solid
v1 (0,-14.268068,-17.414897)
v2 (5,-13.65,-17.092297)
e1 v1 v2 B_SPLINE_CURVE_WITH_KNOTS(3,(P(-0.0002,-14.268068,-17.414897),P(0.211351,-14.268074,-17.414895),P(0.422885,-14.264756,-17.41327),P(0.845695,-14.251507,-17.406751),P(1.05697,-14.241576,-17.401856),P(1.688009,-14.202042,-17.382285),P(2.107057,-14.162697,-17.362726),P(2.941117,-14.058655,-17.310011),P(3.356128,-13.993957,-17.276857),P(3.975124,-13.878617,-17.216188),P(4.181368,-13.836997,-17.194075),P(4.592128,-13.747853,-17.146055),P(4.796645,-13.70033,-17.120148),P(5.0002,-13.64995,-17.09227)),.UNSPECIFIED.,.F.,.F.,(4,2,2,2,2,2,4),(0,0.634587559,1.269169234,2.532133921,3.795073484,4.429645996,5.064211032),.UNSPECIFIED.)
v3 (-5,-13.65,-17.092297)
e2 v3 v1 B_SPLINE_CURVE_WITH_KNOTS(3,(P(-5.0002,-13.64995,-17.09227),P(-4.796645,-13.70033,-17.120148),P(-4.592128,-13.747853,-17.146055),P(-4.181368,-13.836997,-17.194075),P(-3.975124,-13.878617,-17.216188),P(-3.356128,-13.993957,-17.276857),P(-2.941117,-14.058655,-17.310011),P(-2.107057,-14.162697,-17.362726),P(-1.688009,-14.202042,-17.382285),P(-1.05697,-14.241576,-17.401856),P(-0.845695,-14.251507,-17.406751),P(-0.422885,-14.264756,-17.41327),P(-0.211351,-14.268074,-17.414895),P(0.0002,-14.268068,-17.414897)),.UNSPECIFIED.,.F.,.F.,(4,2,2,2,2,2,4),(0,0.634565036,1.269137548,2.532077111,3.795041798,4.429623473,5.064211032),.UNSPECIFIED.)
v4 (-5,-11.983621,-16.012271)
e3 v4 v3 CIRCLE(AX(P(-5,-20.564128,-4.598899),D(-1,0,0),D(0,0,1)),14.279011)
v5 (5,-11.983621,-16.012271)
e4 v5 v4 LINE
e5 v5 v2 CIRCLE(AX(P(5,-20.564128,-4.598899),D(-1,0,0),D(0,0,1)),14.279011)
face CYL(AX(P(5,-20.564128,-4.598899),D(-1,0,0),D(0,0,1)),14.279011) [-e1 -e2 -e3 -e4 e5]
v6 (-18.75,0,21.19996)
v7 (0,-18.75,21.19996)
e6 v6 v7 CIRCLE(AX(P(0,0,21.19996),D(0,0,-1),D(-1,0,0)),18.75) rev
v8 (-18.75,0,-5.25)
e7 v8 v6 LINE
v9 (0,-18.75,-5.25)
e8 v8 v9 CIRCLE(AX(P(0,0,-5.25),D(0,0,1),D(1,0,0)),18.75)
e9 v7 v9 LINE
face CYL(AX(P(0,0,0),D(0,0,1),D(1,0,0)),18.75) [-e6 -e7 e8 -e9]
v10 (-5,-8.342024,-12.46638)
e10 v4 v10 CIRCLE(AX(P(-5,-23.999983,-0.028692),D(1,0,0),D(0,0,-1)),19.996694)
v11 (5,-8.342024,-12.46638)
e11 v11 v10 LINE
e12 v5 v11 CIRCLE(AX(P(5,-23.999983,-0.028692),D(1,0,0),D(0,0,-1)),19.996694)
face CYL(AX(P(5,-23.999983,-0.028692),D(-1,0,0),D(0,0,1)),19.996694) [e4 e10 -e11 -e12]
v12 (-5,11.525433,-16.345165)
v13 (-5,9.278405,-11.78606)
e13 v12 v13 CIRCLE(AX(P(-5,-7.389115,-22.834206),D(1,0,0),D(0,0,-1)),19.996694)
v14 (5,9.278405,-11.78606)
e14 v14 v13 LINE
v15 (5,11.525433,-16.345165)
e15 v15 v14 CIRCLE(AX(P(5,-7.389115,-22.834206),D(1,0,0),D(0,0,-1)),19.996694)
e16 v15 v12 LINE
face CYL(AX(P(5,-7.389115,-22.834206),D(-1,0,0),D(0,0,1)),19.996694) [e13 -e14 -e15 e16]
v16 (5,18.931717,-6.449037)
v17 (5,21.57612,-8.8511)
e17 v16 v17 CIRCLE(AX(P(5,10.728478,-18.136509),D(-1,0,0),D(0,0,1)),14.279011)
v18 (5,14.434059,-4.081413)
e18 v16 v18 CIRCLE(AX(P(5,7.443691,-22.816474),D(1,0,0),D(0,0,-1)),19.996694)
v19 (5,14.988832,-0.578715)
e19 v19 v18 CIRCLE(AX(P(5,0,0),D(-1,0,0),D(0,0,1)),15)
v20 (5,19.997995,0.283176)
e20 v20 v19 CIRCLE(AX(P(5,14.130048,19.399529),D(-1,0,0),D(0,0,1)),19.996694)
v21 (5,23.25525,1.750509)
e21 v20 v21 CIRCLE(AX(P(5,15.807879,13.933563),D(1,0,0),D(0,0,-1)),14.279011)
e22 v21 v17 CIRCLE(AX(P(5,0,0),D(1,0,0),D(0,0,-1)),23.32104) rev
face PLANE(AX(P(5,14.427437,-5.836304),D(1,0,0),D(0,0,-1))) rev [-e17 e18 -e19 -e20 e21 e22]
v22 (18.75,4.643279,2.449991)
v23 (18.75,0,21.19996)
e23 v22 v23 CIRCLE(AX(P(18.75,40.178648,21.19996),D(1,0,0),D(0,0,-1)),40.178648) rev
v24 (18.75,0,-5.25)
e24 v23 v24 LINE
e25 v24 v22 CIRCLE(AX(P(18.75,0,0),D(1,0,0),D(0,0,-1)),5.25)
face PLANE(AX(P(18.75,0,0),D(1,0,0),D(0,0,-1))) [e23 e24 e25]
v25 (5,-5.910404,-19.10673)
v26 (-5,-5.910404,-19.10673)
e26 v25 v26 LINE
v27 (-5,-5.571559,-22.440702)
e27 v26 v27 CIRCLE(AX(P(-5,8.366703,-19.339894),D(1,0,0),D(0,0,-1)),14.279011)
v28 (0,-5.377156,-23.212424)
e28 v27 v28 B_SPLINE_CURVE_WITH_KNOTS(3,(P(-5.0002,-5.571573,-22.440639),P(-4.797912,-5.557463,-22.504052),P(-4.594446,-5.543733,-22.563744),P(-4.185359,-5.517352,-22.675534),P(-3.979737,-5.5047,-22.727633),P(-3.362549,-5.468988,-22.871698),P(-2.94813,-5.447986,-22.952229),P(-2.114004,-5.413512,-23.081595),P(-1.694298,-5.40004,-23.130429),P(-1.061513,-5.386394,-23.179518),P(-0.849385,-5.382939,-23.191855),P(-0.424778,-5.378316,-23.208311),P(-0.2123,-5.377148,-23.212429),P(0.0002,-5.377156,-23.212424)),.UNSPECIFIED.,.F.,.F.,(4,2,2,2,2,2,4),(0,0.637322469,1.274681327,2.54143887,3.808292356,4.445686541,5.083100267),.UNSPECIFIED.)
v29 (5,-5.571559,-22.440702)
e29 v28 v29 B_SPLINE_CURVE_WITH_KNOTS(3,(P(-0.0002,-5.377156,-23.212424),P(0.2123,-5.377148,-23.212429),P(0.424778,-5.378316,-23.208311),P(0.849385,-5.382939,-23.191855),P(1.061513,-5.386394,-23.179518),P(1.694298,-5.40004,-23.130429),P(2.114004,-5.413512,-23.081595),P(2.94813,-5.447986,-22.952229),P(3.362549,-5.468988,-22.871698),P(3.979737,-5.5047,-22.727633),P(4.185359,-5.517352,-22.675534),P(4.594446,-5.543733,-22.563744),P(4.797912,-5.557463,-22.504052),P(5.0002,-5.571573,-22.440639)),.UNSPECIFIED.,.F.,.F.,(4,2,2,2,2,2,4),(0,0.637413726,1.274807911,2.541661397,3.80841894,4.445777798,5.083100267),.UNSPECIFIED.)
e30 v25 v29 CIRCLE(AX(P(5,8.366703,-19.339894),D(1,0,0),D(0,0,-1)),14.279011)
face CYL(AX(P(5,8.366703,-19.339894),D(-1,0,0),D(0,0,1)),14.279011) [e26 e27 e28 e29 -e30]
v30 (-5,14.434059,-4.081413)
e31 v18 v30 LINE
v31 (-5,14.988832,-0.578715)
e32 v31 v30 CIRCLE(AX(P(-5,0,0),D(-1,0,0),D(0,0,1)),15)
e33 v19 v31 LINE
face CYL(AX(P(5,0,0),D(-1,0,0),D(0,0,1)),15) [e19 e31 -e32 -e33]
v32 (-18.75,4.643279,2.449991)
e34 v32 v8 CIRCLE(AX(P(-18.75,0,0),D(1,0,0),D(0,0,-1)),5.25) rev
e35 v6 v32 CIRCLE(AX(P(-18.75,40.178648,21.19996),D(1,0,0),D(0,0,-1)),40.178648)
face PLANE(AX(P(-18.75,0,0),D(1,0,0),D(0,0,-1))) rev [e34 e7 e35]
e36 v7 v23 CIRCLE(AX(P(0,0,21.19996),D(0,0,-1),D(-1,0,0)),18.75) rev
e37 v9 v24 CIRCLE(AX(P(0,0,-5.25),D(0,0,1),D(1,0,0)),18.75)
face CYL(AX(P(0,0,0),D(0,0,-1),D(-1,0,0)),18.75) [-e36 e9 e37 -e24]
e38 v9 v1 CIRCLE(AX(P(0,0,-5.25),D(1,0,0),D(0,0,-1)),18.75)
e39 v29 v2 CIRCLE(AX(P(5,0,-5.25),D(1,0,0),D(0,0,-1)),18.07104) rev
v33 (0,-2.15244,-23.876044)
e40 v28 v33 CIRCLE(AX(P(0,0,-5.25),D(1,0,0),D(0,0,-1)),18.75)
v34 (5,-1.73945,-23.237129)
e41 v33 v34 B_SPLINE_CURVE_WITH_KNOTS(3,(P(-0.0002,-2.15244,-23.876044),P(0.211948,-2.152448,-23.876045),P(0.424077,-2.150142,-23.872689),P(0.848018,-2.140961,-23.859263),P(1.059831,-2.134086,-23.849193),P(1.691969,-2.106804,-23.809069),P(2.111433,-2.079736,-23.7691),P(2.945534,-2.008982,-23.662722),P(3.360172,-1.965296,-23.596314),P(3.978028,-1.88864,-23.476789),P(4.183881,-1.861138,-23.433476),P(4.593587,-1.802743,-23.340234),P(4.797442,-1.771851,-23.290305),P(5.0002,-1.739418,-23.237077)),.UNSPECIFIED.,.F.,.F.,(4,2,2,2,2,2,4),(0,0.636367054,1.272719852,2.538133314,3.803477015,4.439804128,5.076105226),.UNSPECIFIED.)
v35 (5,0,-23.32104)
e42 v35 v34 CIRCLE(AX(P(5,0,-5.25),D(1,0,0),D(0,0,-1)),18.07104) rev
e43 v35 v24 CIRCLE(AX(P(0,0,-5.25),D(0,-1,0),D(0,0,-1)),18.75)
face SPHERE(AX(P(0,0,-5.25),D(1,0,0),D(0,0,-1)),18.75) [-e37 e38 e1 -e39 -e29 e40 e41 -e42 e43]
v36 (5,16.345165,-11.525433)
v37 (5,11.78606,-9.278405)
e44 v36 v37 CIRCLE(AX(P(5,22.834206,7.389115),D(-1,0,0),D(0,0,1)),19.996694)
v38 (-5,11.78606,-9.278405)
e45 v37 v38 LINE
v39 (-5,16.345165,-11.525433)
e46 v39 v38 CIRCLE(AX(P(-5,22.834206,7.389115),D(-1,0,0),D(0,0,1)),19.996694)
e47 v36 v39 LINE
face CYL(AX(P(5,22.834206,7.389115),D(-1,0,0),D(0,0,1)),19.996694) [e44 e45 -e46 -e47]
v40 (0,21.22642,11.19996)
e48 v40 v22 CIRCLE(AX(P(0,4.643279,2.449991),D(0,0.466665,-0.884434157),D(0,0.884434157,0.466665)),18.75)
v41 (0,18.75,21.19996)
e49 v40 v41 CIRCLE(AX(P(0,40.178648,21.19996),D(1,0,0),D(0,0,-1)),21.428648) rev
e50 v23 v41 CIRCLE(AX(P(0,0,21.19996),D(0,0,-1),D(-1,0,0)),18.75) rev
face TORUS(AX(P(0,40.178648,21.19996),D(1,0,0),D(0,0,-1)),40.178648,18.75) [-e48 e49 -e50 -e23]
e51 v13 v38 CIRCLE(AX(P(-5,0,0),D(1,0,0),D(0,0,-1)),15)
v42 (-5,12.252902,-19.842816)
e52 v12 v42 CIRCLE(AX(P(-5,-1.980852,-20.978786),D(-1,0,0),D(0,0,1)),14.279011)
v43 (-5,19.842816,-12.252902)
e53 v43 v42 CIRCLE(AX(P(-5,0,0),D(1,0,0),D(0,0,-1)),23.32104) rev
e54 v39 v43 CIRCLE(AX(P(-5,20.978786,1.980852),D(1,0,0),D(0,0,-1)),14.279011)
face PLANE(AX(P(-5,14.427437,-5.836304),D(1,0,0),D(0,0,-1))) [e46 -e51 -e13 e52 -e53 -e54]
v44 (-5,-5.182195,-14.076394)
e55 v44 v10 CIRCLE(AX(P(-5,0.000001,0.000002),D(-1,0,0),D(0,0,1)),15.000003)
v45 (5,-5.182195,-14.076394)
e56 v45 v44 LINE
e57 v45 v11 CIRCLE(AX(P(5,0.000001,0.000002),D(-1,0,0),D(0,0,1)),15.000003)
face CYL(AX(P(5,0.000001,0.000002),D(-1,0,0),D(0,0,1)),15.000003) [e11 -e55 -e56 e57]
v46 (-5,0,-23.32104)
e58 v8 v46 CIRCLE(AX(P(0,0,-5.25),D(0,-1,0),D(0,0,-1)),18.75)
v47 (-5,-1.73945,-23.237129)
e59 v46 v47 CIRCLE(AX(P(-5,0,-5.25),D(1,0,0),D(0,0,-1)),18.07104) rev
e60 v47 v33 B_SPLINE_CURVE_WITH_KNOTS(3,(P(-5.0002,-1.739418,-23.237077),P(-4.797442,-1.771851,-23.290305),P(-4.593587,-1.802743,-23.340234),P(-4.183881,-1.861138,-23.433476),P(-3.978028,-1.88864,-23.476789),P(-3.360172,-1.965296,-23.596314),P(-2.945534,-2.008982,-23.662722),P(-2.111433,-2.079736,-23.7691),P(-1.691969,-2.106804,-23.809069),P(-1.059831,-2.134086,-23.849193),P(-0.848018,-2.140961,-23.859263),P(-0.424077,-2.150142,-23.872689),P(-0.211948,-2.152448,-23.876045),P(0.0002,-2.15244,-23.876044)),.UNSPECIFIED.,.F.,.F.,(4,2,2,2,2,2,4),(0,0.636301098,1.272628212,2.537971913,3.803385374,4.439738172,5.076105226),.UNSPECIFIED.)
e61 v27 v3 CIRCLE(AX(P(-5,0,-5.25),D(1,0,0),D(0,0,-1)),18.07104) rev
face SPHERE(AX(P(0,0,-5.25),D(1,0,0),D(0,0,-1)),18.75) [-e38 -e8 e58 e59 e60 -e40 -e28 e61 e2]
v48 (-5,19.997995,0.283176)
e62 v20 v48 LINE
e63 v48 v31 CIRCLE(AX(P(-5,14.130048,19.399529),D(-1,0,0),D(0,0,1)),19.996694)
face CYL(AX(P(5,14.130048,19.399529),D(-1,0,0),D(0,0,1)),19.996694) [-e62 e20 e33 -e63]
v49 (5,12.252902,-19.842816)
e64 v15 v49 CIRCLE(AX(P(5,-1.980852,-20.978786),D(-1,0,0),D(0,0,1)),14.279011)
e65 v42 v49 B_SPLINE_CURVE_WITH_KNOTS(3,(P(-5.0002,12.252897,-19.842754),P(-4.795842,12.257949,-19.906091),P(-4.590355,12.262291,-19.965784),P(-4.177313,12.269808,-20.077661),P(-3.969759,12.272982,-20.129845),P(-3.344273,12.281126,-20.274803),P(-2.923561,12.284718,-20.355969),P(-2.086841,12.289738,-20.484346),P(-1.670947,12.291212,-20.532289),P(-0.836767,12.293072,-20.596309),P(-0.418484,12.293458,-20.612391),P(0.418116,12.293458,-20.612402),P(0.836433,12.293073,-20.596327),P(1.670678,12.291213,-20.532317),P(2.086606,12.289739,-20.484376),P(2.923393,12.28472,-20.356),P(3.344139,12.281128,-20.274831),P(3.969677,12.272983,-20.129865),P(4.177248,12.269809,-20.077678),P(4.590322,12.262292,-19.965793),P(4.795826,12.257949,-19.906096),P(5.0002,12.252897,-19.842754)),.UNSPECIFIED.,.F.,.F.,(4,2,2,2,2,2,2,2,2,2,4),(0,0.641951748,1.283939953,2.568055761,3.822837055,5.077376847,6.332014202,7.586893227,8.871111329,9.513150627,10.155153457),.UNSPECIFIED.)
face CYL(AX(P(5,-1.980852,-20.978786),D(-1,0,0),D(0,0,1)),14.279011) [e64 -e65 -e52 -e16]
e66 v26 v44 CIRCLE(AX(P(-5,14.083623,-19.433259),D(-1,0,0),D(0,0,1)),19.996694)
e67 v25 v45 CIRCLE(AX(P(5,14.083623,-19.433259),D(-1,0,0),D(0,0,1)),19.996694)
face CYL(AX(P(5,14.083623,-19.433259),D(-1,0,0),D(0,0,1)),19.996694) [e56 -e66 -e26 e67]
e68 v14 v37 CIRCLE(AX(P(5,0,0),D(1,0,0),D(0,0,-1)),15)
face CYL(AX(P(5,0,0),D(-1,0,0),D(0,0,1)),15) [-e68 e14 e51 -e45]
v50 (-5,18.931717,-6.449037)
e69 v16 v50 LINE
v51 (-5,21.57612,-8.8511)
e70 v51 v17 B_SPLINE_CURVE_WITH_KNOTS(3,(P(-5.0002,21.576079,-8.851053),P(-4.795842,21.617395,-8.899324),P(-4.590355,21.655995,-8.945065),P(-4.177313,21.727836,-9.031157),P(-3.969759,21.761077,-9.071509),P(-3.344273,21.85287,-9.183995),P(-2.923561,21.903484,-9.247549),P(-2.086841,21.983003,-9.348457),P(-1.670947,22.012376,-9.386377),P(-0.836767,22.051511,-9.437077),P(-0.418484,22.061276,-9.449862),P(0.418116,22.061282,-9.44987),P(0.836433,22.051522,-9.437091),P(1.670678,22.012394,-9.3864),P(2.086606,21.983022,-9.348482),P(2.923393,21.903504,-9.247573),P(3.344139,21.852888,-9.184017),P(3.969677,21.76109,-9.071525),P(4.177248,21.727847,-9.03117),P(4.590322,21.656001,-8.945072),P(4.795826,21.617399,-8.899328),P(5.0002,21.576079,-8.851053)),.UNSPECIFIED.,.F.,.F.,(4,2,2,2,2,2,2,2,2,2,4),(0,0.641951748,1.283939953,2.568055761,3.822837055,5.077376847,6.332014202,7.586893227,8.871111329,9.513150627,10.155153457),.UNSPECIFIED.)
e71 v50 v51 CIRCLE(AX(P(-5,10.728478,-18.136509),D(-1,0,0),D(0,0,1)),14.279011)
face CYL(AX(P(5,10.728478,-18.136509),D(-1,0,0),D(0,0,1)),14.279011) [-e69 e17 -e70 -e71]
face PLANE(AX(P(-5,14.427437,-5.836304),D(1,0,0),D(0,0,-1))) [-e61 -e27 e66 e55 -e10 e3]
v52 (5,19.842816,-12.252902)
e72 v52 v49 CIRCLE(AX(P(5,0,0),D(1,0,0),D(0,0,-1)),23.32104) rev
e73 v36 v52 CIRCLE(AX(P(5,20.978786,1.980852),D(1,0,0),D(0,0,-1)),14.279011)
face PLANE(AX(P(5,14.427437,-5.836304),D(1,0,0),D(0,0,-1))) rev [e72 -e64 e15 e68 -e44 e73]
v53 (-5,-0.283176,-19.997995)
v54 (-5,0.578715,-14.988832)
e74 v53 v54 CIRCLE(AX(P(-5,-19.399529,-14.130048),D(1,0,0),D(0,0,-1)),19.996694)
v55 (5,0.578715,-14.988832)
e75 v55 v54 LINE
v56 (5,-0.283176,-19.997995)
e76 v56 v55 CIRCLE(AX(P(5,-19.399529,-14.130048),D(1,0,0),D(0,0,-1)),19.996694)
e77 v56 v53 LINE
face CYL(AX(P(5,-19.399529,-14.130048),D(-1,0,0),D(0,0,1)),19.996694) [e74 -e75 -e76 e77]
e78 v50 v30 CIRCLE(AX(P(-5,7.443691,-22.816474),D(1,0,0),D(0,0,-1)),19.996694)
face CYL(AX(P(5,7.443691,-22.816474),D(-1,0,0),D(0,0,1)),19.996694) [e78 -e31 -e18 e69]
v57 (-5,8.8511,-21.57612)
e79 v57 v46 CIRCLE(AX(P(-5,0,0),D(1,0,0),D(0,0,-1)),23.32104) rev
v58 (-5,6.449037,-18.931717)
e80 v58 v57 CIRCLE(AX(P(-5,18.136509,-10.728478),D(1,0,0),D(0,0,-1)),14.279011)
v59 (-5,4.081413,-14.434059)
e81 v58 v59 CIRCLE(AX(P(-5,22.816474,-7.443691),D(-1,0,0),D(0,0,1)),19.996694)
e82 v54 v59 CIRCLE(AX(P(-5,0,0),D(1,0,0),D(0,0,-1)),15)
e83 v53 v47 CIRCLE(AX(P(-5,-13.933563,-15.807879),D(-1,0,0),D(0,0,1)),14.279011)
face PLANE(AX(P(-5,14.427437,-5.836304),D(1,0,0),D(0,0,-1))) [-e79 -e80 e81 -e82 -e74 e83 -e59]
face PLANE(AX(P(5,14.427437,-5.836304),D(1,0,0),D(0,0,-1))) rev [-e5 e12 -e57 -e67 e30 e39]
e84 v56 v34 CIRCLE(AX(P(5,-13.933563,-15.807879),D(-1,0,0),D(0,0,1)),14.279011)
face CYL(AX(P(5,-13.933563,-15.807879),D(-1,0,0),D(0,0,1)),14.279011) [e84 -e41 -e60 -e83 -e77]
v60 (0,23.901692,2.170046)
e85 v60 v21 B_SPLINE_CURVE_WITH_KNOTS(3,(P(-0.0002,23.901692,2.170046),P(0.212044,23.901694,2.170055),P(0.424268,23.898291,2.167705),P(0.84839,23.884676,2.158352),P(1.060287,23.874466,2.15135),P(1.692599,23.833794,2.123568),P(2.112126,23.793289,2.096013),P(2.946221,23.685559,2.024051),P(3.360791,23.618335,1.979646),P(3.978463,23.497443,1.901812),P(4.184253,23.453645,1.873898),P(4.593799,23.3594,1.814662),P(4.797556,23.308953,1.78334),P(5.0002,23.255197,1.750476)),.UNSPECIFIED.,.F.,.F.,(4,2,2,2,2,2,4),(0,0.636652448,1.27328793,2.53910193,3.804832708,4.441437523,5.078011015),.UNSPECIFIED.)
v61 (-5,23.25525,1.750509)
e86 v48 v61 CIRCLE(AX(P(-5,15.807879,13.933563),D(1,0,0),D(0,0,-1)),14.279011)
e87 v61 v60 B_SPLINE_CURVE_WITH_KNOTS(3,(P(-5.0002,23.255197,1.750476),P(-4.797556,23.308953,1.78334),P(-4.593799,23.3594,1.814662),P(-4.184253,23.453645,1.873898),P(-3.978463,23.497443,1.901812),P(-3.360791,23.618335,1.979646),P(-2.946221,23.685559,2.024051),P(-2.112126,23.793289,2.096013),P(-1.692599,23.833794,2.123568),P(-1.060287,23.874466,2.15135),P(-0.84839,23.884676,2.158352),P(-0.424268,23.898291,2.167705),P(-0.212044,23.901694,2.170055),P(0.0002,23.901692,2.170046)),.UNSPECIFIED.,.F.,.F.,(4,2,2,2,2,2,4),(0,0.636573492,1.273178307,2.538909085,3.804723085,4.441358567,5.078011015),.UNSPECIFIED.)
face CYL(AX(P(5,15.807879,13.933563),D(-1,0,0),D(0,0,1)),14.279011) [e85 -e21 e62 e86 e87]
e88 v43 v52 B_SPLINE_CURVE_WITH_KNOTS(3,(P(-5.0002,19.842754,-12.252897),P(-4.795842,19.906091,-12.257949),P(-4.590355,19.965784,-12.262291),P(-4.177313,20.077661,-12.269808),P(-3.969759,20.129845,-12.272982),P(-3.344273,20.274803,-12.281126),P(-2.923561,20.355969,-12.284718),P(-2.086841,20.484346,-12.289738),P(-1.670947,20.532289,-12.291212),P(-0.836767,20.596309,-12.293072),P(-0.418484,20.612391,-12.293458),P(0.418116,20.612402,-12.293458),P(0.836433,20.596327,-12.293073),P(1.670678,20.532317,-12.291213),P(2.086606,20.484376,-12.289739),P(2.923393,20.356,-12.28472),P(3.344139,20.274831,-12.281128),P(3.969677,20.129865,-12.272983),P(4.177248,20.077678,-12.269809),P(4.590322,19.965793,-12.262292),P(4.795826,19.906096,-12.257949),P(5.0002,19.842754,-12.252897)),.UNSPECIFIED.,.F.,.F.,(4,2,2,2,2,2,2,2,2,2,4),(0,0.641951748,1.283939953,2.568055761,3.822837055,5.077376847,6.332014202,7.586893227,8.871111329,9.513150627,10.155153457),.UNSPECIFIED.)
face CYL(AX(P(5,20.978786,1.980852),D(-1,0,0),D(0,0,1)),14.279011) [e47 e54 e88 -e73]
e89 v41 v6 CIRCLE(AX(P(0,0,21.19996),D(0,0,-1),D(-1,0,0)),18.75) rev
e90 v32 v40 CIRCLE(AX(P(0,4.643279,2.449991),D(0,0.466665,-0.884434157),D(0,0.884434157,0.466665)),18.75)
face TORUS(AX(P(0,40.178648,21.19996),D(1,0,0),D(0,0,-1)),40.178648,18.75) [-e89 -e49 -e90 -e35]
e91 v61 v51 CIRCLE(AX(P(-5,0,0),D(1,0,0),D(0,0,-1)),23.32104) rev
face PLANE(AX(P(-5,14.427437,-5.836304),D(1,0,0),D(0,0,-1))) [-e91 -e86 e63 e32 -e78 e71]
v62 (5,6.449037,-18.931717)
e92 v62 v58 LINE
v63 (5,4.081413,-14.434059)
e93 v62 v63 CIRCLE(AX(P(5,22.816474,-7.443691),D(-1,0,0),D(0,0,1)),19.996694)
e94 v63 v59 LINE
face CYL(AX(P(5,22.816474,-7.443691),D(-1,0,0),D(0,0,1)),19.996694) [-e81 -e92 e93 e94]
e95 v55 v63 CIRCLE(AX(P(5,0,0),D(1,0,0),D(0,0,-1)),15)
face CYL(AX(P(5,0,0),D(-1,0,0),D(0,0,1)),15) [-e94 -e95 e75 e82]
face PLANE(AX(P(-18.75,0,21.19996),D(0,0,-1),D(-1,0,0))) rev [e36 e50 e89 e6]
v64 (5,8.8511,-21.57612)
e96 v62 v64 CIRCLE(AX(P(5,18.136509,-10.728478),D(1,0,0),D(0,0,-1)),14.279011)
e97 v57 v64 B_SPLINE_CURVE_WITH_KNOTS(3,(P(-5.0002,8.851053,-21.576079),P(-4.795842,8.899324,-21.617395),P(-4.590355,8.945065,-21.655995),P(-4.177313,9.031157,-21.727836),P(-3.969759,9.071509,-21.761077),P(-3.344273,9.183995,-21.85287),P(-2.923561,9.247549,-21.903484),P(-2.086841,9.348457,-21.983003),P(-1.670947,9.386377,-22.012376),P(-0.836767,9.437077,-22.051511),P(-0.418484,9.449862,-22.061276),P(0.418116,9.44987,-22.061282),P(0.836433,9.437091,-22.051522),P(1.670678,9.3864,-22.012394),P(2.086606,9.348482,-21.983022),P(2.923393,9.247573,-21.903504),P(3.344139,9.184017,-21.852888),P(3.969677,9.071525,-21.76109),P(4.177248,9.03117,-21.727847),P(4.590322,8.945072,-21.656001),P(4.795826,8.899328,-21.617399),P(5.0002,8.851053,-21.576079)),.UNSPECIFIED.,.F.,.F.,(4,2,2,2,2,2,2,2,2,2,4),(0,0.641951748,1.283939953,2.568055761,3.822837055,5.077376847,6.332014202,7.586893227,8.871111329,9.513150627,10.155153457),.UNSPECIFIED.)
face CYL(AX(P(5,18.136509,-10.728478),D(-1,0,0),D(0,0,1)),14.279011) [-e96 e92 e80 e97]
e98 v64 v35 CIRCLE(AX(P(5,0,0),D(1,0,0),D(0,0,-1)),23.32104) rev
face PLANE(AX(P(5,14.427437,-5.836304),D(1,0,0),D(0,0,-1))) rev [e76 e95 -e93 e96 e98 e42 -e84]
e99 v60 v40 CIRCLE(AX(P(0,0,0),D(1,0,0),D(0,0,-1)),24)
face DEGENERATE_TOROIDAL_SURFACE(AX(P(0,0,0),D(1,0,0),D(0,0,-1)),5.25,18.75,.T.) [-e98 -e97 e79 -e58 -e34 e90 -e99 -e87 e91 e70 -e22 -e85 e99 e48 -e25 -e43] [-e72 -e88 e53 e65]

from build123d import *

# Parameters (mm, degrees)
BOSS_EXTRUDE1_DEPTH      = 18.75
BOSS_EXTRUDE1_DEPTH_BACK = 18.75
FILLET1_R                = 18.75
CUT_EXTRUDE1_DEPTH       = 5
CUT_EXTRUDE1_DEPTH_BACK  = 5


with BuildPart() as part:
    # Sketch1 → Boss-Extrude1 (new, two sides: drawn at the far end of the back side and taken through both)
    with BuildSketch(Plane(origin=(0, 0, 0), x_dir=(0, 0, -1), z_dir=(1, 0, 0)).offset(-BOSS_EXTRUDE1_DEPTH_BACK)):
        with BuildLine():
            Line((-21.199959993, 18.75), (-21.199959993, 0))
            Line((-21.199959993, 0), (24, 0))
            ThreePointArc((24, 0), (21.628103458, 10.403131298), (14.981238267, 18.75))
            Line((14.981238267, 18.75), (-21.199959993, 18.75))
        make_face()
        with BuildLine():
            ThreePointArc((-11.199959993, 21.226419768), (-16.048924785, 19.37831648), (-21.199959993, 18.75))
            Line((-21.199959993, 18.75), (14.981238267, 18.75))
            ThreePointArc((14.981238267, 18.75), (2.260017713, 23.893353049), (-11.199959993, 21.226419768))
        make_face()
        with BuildLine():
            ThreePointArc((24, 0), (18.508252147, -13.258252147), (5.25, -18.75))
            Line((5.25, -18.75), (-21.199959993, -18.75))
            Line((-21.199959993, -18.75), (-21.199959993, 0))
            Line((-21.199959993, 0), (24, 0))
        make_face()
    extrude(amount=BOSS_EXTRUDE1_DEPTH + BOSS_EXTRUDE1_DEPTH_BACK)

    # Fillet1
    fillet1_edges = [part.edges().sort_by_distance(p)[0] for p in [
        (18.75, -18.75, 7.974979997),
        (-18.75, -18.75, 7.974979997),
        (18.75, -13.258252147, -18.508252147),
        (-18.75, -13.258252147, -18.508252147),
        (18.75, 20.552360446, -12.393566076),
        (-18.75, 20.552360446, -12.393566076),
        (18.75, 19.37831648, 16.048924785),
        (-18.75, 19.37831648, 16.048924785),
    ]]
    fillet(fillet1_edges, radius=FILLET1_R - 0.0001)  # a hair under: the kernel refuses the full size

    # Sketch2 → Cut-Extrude1 (cut, two sides: drawn at the far end of the back side and taken through both)
    with BuildSketch(Plane(origin=(0, 0, 0), x_dir=(0, 0, -1), z_dir=(1, 0, 0)).offset(-CUT_EXTRUDE1_DEPTH_BACK)):
        with BuildLine():
            ThreePointArc((6.449036598, 18.931717486), (5.121740793, 16.758420159), (4.08141286, 14.434059341))
            ThreePointArc((4.08141286, 14.434059341), (2.346516976, 14.815325109), (0.578715338, 14.988832128))
            ThreePointArc((0.578715338, 14.988832128), (0.307571672, 17.520909641), (-0.283175845, 19.997995186))
            ThreePointArc((-0.283175845, 19.997995186), (-1.077578354, 22.021879435), (-2.170046216, 23.901692397))
            ThreePointArc((-2.170046216, 23.901692397), (52.177632289, 26.585831545), (18.061354181, -15.804666563))
            ThreePointArc((18.061354181, -15.804666563), (17.182690047, -13.815915161), (16.012271373, -11.983620717))
            ThreePointArc((16.012271373, -11.983620717), (14.35549975, -10.049701585), (12.466380259, -8.34202393))
            ThreePointArc((12.466380259, -8.34202393), (13.365097847, -6.809857488), (14.076393592, -5.182194847))
            ThreePointArc((14.076393592, -5.182194847), (16.568330412, -5.706776879), (19.106729783, -5.910404133))
            ThreePointArc((19.106729783, -5.910404133), (21.277041962, -5.780297079), (23.402441464, -5.322192551))
            ThreePointArc((23.402441464, -5.322192551), (23.704520174, -3.754427161), (23.901692397, -2.170046216))
            ThreePointArc((23.901692397, -2.170046216), (22.021879435, -1.077578354), (19.997995186, -0.283175845))
            ThreePointArc((19.997995186, -0.283175845), (17.520909641, 0.307571672), (14.988832128, 0.578715338))
            ThreePointArc((14.988832128, 0.578715338), (14.815325109, 2.346516975), (14.434059341, 4.08141286))
            ThreePointArc((14.434059341, 4.08141286), (16.75842016, 5.121740793), (18.931717486, 6.449036598))
            ThreePointArc((18.931717486, 6.449036598), (20.611061914, 7.829972908), (22.061279145, 9.449865739))
            ThreePointArc((22.061279145, 9.449865739), (21.384156581, 10.895771994), (20.612396506, 12.293458028))
            ThreePointArc((20.612396506, 12.293458028), (18.449459375, 12.072356759), (16.345164544, 11.525432574))
            ThreePointArc((16.345164544, 11.525432574), (13.993927564, 10.547363003), (11.786059576, 9.278405017))
            ThreePointArc((11.786059576, 9.278405017), (10.606601718, 10.606601718), (9.278405018, 11.786059576))
            ThreePointArc((9.278405018, 11.786059576), (10.547363004, 13.993927564), (11.525432575, 16.345164544))
            ThreePointArc((11.525432575, 16.345164544), (12.072356759, 18.449459375), (12.293458029, 20.612396506))
            ThreePointArc((12.293458029, 20.612396506), (10.895771994, 21.384156581), (9.449865739, 22.061279145))
            ThreePointArc((9.449865739, 22.061279145), (7.829972908, 20.611061914), (6.449036598, 18.931717486))
        make_face()
    extrude(amount=CUT_EXTRUDE1_DEPTH + CUT_EXTRUDE1_DEPTH_BACK, mode=Mode.SUBTRACT)


solid = part.part
